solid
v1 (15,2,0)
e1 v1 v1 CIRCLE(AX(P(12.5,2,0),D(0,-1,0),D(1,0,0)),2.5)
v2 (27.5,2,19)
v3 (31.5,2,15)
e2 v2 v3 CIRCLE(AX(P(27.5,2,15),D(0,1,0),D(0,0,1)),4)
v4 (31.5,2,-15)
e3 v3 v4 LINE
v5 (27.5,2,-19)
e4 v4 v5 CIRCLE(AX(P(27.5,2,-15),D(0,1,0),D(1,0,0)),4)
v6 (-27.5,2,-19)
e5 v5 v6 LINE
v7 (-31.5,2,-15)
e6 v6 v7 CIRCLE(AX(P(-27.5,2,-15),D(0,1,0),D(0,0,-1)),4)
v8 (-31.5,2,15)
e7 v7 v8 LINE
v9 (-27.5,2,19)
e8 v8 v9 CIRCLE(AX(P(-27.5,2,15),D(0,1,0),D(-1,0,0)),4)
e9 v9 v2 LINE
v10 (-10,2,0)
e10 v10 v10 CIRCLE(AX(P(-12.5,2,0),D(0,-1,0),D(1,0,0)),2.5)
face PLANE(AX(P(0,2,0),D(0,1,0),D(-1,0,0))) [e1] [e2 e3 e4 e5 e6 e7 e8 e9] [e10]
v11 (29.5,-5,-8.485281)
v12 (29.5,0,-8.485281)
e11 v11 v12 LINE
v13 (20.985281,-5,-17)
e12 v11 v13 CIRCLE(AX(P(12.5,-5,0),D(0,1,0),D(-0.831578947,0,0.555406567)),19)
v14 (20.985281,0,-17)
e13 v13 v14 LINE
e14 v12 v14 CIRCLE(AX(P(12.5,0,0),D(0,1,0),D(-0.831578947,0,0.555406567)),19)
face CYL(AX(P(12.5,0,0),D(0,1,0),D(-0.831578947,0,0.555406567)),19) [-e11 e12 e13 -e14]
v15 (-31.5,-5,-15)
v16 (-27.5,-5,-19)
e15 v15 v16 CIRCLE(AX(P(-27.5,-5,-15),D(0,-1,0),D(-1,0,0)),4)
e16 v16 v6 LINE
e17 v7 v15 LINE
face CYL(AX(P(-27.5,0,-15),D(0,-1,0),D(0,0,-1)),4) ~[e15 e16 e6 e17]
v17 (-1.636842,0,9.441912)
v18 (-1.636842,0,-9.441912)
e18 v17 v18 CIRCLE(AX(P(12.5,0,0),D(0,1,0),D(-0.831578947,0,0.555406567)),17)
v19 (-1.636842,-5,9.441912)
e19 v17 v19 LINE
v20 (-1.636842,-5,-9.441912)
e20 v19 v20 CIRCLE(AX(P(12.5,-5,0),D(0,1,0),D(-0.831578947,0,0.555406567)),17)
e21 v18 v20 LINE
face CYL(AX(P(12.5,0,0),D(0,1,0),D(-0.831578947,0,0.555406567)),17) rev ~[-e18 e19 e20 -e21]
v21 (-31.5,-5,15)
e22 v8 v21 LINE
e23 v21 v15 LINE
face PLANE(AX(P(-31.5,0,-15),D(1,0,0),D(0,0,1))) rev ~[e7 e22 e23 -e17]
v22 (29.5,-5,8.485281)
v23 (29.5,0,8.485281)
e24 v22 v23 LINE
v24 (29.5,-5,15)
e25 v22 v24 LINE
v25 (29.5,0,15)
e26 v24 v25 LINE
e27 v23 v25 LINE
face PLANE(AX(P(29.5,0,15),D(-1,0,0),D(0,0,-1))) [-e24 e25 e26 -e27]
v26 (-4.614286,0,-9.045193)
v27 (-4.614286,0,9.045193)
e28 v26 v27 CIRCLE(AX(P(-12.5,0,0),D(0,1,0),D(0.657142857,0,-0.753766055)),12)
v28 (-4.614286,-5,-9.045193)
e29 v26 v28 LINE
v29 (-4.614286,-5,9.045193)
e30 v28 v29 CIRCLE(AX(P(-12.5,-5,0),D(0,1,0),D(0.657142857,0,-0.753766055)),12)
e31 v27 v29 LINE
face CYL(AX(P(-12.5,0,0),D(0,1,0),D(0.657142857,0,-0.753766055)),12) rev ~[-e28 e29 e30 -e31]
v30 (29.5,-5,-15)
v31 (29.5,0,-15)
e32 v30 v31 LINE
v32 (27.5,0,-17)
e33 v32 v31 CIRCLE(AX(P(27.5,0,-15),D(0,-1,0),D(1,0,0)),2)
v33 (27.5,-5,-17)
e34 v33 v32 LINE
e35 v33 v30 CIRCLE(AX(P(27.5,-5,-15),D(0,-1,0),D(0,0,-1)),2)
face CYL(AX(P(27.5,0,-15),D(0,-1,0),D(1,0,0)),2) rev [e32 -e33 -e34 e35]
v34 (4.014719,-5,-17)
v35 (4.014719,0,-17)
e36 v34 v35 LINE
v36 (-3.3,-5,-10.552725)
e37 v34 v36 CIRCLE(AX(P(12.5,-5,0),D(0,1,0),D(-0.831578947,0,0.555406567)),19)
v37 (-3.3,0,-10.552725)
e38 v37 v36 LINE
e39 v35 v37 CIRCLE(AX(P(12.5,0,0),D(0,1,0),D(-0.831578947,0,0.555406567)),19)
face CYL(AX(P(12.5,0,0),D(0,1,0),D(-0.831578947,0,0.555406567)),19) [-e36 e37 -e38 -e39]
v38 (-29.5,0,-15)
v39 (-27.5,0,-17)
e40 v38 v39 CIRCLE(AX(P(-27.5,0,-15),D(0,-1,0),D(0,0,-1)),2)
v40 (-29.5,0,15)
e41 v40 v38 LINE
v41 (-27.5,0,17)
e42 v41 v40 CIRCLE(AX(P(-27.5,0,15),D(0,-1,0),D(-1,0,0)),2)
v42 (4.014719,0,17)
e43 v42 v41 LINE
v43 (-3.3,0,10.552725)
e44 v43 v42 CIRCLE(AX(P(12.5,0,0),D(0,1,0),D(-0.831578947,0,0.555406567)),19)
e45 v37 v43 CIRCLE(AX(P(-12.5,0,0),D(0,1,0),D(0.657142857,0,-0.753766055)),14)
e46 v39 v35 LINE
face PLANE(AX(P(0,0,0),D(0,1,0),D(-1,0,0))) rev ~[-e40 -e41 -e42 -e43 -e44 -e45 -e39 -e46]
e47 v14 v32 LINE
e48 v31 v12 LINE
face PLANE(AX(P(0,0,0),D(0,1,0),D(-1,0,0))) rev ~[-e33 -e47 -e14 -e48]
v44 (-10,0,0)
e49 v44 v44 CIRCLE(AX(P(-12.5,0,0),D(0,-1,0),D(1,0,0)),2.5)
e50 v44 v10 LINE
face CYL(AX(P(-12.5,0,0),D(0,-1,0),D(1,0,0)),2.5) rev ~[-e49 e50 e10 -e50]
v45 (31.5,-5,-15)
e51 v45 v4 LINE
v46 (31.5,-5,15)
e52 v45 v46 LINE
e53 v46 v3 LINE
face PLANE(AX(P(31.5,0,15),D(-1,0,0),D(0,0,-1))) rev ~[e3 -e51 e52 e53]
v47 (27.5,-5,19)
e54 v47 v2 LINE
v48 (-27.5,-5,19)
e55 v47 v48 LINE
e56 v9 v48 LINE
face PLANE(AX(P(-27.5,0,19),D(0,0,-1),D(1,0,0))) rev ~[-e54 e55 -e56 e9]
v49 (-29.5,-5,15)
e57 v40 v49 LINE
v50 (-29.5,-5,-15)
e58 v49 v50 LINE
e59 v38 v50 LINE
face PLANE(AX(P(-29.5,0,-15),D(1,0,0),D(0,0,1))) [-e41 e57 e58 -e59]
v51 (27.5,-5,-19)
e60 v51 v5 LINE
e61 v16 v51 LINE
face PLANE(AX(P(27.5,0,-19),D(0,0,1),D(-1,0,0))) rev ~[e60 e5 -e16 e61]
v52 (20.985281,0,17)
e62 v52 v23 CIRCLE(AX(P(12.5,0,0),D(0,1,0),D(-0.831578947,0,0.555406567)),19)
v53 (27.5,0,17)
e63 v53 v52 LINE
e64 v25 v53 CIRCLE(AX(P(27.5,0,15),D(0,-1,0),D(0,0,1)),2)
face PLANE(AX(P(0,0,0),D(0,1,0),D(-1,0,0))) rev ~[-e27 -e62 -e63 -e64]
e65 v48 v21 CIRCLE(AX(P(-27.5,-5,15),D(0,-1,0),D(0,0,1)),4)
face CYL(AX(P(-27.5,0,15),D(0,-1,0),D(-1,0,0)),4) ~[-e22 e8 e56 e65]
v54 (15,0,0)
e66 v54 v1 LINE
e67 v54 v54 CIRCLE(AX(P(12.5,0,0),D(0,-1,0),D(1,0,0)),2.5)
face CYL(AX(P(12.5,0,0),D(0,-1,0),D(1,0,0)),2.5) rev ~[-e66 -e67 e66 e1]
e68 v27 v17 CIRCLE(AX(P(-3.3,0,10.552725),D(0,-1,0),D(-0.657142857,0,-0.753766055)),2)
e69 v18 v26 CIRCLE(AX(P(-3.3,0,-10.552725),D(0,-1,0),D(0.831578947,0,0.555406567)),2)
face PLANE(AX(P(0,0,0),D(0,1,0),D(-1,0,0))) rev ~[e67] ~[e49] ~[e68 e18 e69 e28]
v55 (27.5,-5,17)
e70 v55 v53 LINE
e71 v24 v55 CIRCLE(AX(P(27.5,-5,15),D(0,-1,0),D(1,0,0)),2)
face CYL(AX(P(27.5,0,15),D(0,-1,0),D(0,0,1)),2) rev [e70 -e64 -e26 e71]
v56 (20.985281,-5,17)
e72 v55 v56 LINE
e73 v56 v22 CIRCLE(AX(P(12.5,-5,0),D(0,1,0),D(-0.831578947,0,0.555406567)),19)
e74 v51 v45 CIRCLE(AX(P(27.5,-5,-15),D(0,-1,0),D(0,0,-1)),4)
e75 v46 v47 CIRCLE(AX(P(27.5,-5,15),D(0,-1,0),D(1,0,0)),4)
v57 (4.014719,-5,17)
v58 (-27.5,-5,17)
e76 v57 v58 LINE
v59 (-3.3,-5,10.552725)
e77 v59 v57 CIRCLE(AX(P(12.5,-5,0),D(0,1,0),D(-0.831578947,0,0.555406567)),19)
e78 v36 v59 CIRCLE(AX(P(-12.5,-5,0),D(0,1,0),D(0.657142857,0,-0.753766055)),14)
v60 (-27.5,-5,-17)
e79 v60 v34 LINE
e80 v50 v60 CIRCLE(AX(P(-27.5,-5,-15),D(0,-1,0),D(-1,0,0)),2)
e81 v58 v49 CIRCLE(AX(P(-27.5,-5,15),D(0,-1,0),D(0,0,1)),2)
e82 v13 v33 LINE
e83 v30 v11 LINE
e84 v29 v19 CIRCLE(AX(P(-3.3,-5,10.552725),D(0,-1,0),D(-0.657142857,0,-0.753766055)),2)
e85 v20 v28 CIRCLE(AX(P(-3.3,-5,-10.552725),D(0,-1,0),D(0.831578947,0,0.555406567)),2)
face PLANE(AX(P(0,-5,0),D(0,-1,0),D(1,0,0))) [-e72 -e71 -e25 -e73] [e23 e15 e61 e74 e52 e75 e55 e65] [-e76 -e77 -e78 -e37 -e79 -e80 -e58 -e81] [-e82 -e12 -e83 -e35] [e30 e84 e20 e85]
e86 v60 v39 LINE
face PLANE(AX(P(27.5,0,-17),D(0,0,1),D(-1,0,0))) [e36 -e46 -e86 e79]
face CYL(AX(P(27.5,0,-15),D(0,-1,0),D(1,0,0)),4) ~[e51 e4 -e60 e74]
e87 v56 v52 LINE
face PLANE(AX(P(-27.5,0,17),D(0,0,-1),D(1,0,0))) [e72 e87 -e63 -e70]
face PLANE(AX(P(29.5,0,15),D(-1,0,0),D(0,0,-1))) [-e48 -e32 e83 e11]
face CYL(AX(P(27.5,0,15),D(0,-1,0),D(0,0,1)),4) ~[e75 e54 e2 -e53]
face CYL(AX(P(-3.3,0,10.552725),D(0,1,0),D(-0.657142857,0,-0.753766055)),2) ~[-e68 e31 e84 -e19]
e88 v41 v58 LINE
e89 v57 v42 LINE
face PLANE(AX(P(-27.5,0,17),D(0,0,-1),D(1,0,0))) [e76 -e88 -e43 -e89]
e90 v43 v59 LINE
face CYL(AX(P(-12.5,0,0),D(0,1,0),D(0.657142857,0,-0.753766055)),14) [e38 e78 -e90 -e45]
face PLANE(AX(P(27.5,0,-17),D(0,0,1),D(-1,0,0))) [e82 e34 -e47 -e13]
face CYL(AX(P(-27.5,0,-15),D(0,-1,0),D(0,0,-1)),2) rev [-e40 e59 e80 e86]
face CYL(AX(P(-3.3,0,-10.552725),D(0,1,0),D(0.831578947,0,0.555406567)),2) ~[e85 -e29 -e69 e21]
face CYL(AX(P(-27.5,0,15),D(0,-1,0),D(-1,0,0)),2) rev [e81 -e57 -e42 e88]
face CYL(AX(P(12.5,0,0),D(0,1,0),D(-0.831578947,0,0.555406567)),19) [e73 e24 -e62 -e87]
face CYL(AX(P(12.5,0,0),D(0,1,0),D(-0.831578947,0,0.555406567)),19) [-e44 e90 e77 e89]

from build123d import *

# Parameters (mm, degrees)
F1_DEPTH     = 5
F3_DEPTH     = 2
F4_T         = 2
F4_T4_ANGLE  = 97.3436104927
F4_T6_ANGLE  = 292.5225547035
F4_T8_ANGLE  = 97.3436104927
F4_T10_ANGLE = 262.1646662819
F5_R         = 2.5
F6_DEPTH     = 2


# Not quite as in the source:
# - a shell that OpenCascade refuses in one call is made with other operations: the cavity is built on its own and cut out


with BuildPart() as f1:
    # F0 (on Front) → F1 (new body)
    with BuildSketch(Plane.XZ):
        with BuildLine():
            ThreePointArc((31.5, 15), (30.3284271247, 17.8284271247), (27.5, 19))
            Line((27.5, 19), (-27.5, 19))
            ThreePointArc((-27.5, 19), (-30.3284271247, 17.8284271247), (-31.5, 15))
            Line((-31.5, 15), (-31.5, -15))
            ThreePointArc((-31.5, -15), (-30.3284271247, -17.8284271247), (-27.5, -19))
            Line((-27.5, -19), (27.5, -19))
            ThreePointArc((27.5, -19), (30.3284271247, -17.8284271247), (31.5, -15))
            Line((31.5, -15), (31.5, 15))
        make_face()
        with BuildLine():
            ThreePointArc((-1.6368421053, 9.4419116333), (29.5, 0), (-1.6368421053, -9.4419116333))
            ThreePointArc((-1.6368421053, -9.4419116333), (-3.0358514886, -8.5702451163), (-4.6142857143, -9.0451926571))
            ThreePointArc((-4.6142857143, -9.0451926571), (-24.5, 0), (-4.6142857143, 9.0451926571))
            ThreePointArc((-4.6142857143, 9.0451926571), (-3.0358514886, 8.5702451163), (-1.6368421053, 9.4419116333))
        make_face(mode=Mode.SUBTRACT)
    extrude(amount=F1_DEPTH)

    # F2 (on face) → F3 (join)
    with BuildSketch(Plane(origin=(0, 0, 0), x_dir=(-1, 0, 0), z_dir=(0, 1, 0))):
        with BuildLine():
            Line((27.5, 19), (-27.5, 19))
            ThreePointArc((-27.5, 19), (-30.3284271247, 17.8284271247), (-31.5, 15))
            Line((-31.5, 15), (-31.5, -15))
            ThreePointArc((-31.5, -15), (-30.3284271247, -17.8284271247), (-27.5, -19))
            Line((-27.5, -19), (27.5, -19))
            ThreePointArc((27.5, -19), (30.3284271247, -17.8284271247), (31.5, -15))
            Line((31.5, -15), (31.5, 15))
            ThreePointArc((31.5, 15), (30.3284271247, 17.8284271247), (27.5, 19))
        make_face()
    extrude(amount=F3_DEPTH)

    # F4: shell of thickness 2, made by hand


with BuildPart() as f4_core1:
    # F4_t2: copy of F1
    add(f1.part)

    # the walls: a layer under each face that stays
    f4_faces = [f4_core1.faces().sort_by_distance(p)[0] for p in [
        (30.3284271247, -1.5, 17.8284271247),
        (0, 2, 0),
        (-30.3284271247, -1.5, 17.8284271247),
        (-31.5, -1.5, 0),
        (-30.3284271247, -1.5, -17.8284271247),
        (0, -1.5, -19),
        (30.3284271247, -1.5, -17.8284271247),
        (0, -1.5, 19),
        (2.5, 0, 0),
        (29.5, -2.5, 0),
        (-24.5, -2.5, 0),
        (31.5, -1.5, 0),
    ]]
    thicken(f4_faces, amount=-F4_T, mode=Mode.SUBTRACT)

    # F4_s3 → F4_t4 (revolve, cut)
    with BuildSketch(Plane(origin=(3.8559556787, 0, -5.7733051009), x_dir=(0, 1, 0), z_dir=(0.5554065667, 0, -0.8315789474))):
        Polygon((-0.02, -6.5852631579), (0, -8.6052631579), (2, -8.6052631579), (2, -6.6052631579), align=None)
    revolve(axis=Axis((-3.3, 0, -10.5527247666), (0, -1, 0)), revolution_arc=F4_T4_ANGLE, mode=Mode.SUBTRACT)

    # F4_s5 → F4_t6 (revolve, cut)
    with BuildSketch(Plane(origin=(3.8559556787, 0, 5.7733051009), x_dir=(0, 1, 0), z_dir=(-0.5554065667, 0, -0.8315789474))):
        Polygon((-0.02, -6.5852631579), (2, -6.6052631579), (2, -8.6052631579), (0, -8.6052631579), align=None)
    revolve(axis=Axis((12.5, 0, 0), (0, 1, 0)), revolution_arc=F4_T6_ANGLE, mode=Mode.SUBTRACT)

    # F4_s7 → F4_t8 (revolve, cut)
    with BuildSketch(Plane(origin=(-7.1020408163, 0, 6.1916497355), x_dir=(0, 1, 0), z_dir=(-0.7537660548, 0, 0.6571428571))):
        Polygon((-0.02, -3.7657142857), (2, -3.7857142857), (2, -5.7857142857), (0, -5.7857142857), align=None)
    revolve(axis=Axis((-3.3, 0, 10.5527247666), (0, -1, 0)), revolution_arc=F4_T8_ANGLE, mode=Mode.SUBTRACT)

    # F4_s9 → F4_t10 (revolve, cut)
    with BuildSketch(Plane(origin=(-7.1020408163, 0, -6.1916497355), x_dir=(0, 1, 0), z_dir=(0.7537660548, 0, 0.6571428571))):
        Polygon((-0.02, -3.7657142857), (2, -3.7857142857), (2, -5.7857142857), (0, -5.7857142857), align=None)
    revolve(axis=Axis((-12.5, 0, 0), (0, 1, 0)), revolution_arc=F4_T10_ANGLE, mode=Mode.SUBTRACT)


with BuildPart() as f1_1:
    add(f1.part)

    # what is left inside the walls is the cavity
    f4_cavity = [f4_core1.part.solids().sort_by_distance(p)[0] for p in [
        (25.949171, -3.333333, 13.449171),
        (25.949171, -3.333333, -13.449171),
        (-21.12132, -0.02, -13.222222),
    ]]
    add(f4_cavity, mode=Mode.SUBTRACT)

    # F5 (on face) → F6 (cut, through all)
    with BuildSketch(Plane.XZ):
        with Locations((-12.5, 0)):
            Circle(F5_R)
        with Locations((12.5, 0)):
            Circle(F5_R)
    extrude(amount=-F6_DEPTH, mode=Mode.SUBTRACT)


solid = f1_1.part
